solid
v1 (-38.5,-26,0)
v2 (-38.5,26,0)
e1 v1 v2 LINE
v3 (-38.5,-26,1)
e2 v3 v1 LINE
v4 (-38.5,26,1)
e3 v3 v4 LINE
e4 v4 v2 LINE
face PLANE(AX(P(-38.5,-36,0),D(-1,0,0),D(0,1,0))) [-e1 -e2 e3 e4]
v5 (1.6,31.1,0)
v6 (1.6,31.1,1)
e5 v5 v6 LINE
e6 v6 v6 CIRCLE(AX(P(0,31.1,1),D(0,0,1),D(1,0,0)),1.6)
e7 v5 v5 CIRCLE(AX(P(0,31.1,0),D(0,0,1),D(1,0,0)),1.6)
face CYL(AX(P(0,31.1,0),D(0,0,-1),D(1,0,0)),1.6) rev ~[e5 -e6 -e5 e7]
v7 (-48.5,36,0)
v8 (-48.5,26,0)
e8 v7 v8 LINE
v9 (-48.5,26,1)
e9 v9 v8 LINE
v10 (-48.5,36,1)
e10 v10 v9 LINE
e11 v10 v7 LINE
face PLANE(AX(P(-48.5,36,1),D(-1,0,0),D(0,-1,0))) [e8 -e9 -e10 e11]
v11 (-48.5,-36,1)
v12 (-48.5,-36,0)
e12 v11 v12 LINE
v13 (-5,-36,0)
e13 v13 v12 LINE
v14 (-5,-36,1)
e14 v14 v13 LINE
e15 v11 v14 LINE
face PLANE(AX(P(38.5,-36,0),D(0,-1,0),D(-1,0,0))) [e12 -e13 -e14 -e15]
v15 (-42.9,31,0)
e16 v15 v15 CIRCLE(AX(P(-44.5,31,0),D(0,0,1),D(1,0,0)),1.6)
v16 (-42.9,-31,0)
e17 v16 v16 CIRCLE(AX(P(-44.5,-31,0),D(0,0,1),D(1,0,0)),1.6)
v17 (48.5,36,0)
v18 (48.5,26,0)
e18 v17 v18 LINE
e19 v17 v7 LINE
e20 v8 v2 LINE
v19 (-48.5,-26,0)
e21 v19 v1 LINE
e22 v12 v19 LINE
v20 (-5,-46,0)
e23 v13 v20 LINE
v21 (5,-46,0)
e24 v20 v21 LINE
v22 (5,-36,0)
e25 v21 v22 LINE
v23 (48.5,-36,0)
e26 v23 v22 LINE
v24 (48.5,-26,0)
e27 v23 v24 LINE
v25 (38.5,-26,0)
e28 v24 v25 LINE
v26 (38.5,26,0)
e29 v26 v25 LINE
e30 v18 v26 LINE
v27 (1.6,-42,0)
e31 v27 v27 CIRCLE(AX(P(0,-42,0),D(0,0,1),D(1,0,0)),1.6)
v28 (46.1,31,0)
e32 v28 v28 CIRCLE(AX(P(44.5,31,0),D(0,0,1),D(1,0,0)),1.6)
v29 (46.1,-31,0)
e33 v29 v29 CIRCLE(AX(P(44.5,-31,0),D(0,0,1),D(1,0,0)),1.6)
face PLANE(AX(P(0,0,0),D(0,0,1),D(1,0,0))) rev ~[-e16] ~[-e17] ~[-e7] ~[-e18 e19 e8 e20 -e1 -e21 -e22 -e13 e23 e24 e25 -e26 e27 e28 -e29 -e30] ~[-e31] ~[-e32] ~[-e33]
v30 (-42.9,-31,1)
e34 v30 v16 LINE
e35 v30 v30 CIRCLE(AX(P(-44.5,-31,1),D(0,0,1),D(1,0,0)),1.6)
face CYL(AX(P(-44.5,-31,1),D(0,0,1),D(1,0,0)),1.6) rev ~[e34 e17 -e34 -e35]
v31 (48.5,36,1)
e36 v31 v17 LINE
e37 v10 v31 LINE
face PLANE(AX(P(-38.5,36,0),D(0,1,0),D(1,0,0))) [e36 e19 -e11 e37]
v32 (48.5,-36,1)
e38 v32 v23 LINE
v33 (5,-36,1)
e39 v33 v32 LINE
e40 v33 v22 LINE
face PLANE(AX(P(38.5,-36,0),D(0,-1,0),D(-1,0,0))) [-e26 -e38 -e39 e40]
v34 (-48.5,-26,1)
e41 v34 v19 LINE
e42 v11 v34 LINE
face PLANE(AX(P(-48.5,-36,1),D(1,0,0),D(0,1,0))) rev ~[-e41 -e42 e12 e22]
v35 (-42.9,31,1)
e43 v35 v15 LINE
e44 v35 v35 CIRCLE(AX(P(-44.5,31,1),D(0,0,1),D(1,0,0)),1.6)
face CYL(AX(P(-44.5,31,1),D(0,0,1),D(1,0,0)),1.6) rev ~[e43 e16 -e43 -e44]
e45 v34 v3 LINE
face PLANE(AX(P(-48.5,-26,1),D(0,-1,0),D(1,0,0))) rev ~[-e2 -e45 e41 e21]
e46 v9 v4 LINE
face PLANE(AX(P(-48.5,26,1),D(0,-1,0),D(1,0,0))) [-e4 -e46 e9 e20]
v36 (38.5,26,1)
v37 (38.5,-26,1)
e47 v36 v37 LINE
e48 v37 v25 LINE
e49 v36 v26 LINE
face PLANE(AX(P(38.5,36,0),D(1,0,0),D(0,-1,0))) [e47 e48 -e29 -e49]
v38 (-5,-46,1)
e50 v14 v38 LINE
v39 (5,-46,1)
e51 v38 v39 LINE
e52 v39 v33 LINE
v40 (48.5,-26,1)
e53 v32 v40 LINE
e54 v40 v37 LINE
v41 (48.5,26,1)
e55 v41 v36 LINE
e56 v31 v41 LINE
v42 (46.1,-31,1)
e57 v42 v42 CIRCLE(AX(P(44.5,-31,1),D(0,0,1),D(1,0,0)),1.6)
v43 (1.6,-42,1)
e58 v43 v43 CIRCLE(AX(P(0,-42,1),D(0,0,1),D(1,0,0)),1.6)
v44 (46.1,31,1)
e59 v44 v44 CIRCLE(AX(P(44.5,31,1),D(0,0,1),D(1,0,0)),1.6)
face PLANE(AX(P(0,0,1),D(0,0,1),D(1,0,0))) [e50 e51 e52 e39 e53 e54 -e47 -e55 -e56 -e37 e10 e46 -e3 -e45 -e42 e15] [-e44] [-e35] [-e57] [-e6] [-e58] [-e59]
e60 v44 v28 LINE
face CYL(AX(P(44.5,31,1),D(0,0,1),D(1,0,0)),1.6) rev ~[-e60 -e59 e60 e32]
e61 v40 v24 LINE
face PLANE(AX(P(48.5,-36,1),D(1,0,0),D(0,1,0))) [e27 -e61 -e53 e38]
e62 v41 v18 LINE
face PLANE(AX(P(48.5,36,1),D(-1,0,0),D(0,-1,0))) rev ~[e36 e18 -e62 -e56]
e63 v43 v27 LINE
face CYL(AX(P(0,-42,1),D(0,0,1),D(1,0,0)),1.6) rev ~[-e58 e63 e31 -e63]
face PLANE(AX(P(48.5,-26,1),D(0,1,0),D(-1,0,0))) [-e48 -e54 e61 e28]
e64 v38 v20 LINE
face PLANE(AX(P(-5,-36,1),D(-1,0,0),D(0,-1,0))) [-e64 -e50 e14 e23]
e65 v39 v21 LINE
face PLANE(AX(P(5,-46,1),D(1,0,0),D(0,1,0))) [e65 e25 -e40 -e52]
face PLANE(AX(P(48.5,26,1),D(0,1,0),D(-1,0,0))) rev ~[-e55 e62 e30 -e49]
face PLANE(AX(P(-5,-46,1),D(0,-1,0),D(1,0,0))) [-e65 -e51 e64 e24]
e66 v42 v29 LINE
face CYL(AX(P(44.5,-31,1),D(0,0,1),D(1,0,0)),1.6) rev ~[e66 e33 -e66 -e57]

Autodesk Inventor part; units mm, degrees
ref_plane "YZ Plane" through (0, 0, 0) normal (1, 0, 0) x (0, 1, 0)
ref_plane "XZ Plane" through (0, 0, 0) normal (0, 1, 0) x (-1, 0, 0)
ref_plane "XY Plane" through (0, 0, 0) normal (0, 0, 1) x (1, 0, 0)
sketch "Sketch1" plane through (0, 0, 0) normal (0, 0, 1) x (1, 0, 0)
  line L0 (-38.5, 36) -> (38.5, 36)
  line L1 (38.5, 36) -> (38.5, -36)
  line L2 (38.5, -36) -> (-38.5, -36)
  line L3 (-38.5, -36) -> (-38.5, 36)
  line L4 (-38.5, 36) -> (38.5, -36) construction
  line L5 (38.5, 36) -> (-38.5, -36) construction
  circle A0 centre (0, 31.1) radius 1.6
  point P0 (0, 0)
  dimension "d0" = 72
  dimension "d1" = 77
  dimension "d24" = 3.2
  dimension "d25" = 4.9
sketch "Sketch2" plane through (0, 0, 1) normal (0, 0, 1) x (1, 0, 0)
  line L0 (-38.5, 36) -> (38.5, 36)
  line L1 (-48.5, 26) -> (-38.5, 26)
  line L2 (-38.5, 26) -> (-38.5, 36)
  line L3 (-38.5, 36) -> (-48.5, 36)
  line L4 (-48.5, 36) -> (-48.5, 26)
  line L5 (-48.5, 26) -> (-38.5, 36) construction
  line L6 (-38.5, 26) -> (-48.5, 36) construction
  line L7 (0, 0) -> (0, 7.0571)
  line L8 (0, 0) -> (6.6312, 0)
  line L9 (-38.5, -36) -> (-38.5, 36)
  line L10 (48.5, 26) -> (38.5, 26)
  line L11 (38.5, 26) -> (38.5, 36)
  line L12 (38.5, 36) -> (48.5, 36)
  line L13 (48.5, 36) -> (48.5, 26)
  line L14 (48.5, 26) -> (38.5, 36) construction
  line L15 (38.5, 26) -> (48.5, 36) construction
  circle A0 centre (-44.5, 31) radius 1.6
  circle A1 centre (44.5, 31) radius 1.6
  line L16 (38.5, -36) -> (-38.5, -36)
  line L17 (-5, -46) -> (5, -46)
  line L18 (5, -46) -> (5, -36)
  line L19 (5, -36) -> (-5, -36)
  line L20 (-5, -36) -> (-5, -46)
  line L21 (-5, -46) -> (5, -36) construction
  line L22 (5, -46) -> (-5, -36) construction
  circle A2 centre (0, -42) radius 1.6
  line L23 (-48.5, -26) -> (-38.5, -26)
  line L24 (-38.5, -26) -> (-38.5, -36)
  line L25 (-38.5, -36) -> (-48.5, -36)
  line L26 (-48.5, -36) -> (-48.5, -26)
  line L27 (-48.5, -26) -> (-38.5, -36) construction
  line L28 (-38.5, -26) -> (-48.5, -36) construction
  line L29 (38.5, -26) -> (38.5, -36)
  line L30 (38.5, -36) -> (48.5, -36)
  line L31 (48.5, -36) -> (48.5, -26)
  line L32 (48.5, -26) -> (38.5, -36) construction
  line L33 (38.5, -26) -> (48.5, -36) construction
  line L34 (48.5, -26) -> (38.5, -26)
  circle A3 centre (-44.5, -31) radius 1.6
  circle A4 centre (44.5, -31) radius 1.6
  point P0 (-43.5, 31)
  point P1 (43.5, 31)
  point P2 (0, -41)
  point P3 (-38.5, -36)
  point P4 (-43.5, -31)
  point P5 (43.5, -31)
  dimension "d5" = 10
  dimension "d6" = 10
  dimension "d10" = 3.2
  dimension "d12" = 4
  dimension "d18" = 3.2
  dimension "d19" = 10
  dimension "d20" = 10
  dimension "d21" = 4
  dimension "d22" = 5
extrude "Plate1" add sketch "Sketch1" along normal blind 1
sheet face with bend "Face2" sketch "Sketch2" thickness 1 toward (0, 0, -1) bend radius 1
bend "Bend1"
equation "\"d2\" = 厚度"
equation "\"d13\" = 折彎半徑"
equation "\"d14\" = 折彎離隙寬度"
equation "\"d16\" = 最小剩餘"
equation "\"d15\" = 折彎離隙深度"
equation "\"d17\" = 轉移半徑"
equation "\"折彎半徑\" = 厚度"
equation "\"折彎離隙寬度\" = 厚度"
equation "\"折彎離隙深度\" = 0.5 * 厚度"
equation "\"轉角離隙大小\" = 4 * 厚度"
equation "\"最小剩餘\" = 2 * 厚度"
equation "\"轉移半徑\" = 折彎半徑"
equation "\"Jacobi半徑大小\" = 折彎半徑"
equation "\"間隙大小\" = 厚度"
equation "\"厚度\" = 1"
properties part number "battery_box_24V_base" material "Aluminum"
